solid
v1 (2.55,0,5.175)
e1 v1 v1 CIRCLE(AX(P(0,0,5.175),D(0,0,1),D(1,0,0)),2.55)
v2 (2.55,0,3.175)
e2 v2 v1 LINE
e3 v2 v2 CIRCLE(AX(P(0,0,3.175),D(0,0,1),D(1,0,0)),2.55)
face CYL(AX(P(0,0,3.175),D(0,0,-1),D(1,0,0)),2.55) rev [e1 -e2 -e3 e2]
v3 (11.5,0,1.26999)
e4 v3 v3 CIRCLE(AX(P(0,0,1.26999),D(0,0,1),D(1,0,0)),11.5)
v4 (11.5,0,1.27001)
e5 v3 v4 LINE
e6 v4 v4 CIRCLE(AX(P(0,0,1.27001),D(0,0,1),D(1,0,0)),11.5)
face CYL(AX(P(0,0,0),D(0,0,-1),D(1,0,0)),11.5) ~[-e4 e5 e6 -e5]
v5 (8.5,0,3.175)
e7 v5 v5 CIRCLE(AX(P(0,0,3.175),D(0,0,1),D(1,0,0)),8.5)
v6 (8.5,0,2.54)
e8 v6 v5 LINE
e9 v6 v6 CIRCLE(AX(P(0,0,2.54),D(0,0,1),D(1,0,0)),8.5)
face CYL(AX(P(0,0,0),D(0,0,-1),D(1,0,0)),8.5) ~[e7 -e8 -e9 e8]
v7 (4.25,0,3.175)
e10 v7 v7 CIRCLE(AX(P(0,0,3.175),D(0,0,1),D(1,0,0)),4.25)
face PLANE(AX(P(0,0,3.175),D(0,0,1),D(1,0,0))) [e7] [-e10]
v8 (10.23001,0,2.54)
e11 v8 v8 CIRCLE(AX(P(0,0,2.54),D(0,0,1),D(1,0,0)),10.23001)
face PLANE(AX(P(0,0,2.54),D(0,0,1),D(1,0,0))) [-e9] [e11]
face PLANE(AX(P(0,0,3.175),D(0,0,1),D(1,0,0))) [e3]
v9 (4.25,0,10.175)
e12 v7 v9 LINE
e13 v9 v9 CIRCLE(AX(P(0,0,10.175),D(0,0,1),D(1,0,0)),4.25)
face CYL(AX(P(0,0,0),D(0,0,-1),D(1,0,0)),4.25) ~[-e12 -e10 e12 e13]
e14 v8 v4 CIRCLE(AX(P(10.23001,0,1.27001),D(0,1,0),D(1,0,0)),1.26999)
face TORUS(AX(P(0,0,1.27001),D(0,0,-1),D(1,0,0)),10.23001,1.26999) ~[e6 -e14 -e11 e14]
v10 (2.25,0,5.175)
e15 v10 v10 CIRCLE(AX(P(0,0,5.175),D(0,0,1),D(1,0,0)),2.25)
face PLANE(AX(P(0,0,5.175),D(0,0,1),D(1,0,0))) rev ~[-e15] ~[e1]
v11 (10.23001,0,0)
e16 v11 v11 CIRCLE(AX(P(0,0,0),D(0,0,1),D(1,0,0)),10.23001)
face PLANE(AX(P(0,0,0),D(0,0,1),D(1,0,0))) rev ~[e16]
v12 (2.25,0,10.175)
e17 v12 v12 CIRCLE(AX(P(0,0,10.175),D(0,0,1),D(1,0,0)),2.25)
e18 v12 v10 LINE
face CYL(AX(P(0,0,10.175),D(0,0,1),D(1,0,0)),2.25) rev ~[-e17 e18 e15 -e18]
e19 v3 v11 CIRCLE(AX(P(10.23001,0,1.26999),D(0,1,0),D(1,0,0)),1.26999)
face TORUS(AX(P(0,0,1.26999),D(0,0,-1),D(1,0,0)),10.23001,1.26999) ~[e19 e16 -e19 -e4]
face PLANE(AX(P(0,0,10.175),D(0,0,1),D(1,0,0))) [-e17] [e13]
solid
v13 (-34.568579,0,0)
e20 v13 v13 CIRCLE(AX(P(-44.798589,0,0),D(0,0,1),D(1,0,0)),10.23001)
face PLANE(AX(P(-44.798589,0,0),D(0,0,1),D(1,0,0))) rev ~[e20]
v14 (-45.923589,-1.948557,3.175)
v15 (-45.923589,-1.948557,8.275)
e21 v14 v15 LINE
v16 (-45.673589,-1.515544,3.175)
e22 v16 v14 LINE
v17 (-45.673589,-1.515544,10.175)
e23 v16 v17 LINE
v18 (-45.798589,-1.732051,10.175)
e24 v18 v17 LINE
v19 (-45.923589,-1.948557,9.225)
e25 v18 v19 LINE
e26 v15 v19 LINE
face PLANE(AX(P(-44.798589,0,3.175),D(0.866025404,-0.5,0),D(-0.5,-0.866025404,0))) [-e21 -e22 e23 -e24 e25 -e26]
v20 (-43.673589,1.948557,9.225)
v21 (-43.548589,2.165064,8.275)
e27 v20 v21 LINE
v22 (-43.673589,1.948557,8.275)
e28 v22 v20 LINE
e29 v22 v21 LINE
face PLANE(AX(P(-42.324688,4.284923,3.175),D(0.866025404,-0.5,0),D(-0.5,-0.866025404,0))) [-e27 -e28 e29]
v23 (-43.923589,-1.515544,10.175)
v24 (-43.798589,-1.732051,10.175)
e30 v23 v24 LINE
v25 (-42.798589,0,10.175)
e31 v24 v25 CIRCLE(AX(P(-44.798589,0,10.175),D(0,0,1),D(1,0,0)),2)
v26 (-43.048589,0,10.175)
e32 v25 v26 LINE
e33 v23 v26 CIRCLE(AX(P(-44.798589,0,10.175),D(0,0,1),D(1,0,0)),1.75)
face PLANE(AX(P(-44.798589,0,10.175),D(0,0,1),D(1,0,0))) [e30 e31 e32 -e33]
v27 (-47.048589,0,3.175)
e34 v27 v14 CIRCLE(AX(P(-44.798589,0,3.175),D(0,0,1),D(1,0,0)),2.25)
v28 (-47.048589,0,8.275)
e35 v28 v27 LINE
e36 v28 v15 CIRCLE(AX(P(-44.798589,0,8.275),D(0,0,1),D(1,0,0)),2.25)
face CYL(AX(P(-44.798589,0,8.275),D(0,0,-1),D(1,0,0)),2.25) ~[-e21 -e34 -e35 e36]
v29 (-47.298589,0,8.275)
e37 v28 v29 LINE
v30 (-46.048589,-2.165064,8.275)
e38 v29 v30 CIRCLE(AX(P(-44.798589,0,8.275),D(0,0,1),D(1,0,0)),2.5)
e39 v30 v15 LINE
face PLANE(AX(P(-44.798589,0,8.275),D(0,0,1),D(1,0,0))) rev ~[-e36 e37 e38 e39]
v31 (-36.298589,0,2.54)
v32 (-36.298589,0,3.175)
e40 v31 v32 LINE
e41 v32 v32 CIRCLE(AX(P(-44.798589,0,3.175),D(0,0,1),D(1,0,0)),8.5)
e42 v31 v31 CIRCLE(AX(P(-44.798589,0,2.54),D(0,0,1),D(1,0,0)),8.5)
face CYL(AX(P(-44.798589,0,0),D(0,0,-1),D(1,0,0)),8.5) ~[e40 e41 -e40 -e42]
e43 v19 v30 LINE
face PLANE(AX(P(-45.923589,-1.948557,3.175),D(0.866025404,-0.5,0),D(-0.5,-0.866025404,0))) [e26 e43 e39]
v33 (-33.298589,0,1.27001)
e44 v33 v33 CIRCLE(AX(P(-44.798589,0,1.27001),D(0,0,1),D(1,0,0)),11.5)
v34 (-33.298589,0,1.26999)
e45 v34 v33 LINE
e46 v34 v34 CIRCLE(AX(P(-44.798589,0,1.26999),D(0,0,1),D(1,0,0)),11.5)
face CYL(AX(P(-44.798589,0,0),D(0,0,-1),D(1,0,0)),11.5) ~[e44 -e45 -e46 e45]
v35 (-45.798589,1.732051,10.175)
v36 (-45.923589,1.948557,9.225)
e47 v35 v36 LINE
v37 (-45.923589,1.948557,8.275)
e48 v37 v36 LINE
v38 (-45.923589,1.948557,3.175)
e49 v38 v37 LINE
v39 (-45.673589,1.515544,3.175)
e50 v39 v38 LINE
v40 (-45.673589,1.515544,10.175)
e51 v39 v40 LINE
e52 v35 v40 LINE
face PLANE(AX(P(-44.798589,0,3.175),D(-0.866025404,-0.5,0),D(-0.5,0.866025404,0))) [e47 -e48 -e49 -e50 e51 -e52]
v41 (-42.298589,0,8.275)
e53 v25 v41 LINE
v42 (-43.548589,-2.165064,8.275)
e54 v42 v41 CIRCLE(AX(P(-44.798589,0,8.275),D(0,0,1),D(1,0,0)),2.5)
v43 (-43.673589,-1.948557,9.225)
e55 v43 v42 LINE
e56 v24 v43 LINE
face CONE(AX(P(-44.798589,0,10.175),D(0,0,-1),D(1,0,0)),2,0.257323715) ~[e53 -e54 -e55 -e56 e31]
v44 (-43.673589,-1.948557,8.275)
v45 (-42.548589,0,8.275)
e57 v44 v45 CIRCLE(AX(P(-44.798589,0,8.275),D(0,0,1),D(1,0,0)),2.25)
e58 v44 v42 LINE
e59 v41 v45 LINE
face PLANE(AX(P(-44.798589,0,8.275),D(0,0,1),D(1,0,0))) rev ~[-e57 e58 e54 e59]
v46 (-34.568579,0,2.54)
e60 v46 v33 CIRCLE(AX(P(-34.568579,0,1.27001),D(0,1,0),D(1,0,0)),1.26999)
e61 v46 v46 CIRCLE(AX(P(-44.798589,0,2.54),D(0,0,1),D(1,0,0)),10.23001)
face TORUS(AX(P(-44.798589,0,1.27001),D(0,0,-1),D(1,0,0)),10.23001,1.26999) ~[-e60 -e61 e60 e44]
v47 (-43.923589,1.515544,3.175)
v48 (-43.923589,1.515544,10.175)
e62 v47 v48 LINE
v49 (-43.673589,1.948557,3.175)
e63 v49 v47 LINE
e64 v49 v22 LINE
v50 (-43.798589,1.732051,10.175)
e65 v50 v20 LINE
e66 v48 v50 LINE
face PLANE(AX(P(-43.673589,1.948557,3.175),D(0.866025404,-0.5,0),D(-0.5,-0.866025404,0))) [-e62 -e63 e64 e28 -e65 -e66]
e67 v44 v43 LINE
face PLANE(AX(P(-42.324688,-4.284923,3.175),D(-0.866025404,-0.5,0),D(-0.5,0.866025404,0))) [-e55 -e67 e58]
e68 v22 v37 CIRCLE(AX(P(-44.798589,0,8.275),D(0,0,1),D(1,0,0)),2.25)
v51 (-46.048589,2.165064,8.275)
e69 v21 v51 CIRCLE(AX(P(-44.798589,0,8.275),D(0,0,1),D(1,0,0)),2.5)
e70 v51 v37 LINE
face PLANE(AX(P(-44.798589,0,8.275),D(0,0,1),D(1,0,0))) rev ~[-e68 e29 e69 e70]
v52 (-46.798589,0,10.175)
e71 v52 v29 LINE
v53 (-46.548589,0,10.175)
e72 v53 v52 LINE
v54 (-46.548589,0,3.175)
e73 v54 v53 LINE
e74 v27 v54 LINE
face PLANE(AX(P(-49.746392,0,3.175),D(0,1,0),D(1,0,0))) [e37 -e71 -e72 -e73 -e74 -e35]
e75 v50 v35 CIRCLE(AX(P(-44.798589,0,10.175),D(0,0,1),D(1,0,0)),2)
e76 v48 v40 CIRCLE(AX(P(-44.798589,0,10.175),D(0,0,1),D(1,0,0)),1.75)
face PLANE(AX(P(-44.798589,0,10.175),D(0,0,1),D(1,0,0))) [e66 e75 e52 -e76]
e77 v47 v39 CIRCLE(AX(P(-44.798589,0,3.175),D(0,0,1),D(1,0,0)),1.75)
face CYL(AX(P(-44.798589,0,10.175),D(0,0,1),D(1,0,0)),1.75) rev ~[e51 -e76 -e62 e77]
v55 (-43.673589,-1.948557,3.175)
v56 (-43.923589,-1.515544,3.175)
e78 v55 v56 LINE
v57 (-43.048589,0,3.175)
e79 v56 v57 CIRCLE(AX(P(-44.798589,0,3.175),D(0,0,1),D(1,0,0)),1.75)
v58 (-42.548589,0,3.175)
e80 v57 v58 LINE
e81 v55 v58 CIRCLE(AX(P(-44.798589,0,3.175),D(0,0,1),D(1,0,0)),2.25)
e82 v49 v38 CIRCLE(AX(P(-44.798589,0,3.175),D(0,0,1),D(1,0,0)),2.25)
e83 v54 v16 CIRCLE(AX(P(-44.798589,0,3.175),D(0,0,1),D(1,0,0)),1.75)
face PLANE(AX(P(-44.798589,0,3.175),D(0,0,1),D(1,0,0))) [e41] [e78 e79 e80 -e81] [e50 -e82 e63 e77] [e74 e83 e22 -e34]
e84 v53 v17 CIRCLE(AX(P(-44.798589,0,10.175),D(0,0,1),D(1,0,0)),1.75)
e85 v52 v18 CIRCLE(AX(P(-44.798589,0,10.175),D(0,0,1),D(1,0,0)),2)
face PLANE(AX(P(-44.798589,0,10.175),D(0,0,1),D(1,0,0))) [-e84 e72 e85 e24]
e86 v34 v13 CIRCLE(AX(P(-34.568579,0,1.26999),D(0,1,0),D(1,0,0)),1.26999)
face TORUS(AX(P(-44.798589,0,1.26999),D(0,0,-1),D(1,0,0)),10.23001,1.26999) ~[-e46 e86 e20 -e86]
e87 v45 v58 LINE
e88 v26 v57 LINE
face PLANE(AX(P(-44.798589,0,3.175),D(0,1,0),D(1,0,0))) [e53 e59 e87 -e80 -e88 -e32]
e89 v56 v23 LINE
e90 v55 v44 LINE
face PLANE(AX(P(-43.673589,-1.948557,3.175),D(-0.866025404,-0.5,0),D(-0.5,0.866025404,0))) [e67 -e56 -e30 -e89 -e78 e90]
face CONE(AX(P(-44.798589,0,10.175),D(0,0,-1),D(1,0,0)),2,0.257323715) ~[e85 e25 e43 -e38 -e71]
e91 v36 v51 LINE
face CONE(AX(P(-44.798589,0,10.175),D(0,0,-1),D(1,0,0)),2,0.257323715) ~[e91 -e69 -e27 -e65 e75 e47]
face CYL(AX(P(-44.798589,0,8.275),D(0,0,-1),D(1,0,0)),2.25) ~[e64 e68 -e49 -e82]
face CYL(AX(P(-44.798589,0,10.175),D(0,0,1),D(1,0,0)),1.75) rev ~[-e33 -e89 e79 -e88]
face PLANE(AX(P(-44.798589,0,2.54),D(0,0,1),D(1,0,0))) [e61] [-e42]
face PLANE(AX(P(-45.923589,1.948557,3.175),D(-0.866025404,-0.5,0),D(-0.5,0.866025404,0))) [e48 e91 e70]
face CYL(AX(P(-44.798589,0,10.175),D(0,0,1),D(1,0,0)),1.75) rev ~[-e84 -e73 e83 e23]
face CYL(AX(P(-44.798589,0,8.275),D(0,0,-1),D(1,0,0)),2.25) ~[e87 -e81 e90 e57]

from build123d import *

# Parameters (mm, degrees)
F0_R      = 11.5
F0_R_2    = 8.5
F1_DEPTH  = 2.54
F0_R_3    = 4.25
F2_DEPTH  = 3.175
F3_DEPTH  = 10.175
F4_R      = 1.26999
F5_R      = 11.5
F5_R_2    = 8.5
F6_DEPTH  = 2.54
F5_R_3    = 2.5
F7_DEPTH  = 3.175
F8_DEPTH  = 10.175
F9_R      = 2.25
F10_DEPTH = 7
F11_R     = 1.26999
F12_R     = 2.55
F13_DEPTH = 2
F16_R     = 1.75
F17_DEPTH = 7
F19_DEPTH = 25.4


# Not quite as in the source:
# - a fillet or chamfer is up to 0.001 mm smaller than in the source, because OpenCascade refuses the exact size


with BuildPart() as f1:
    # F0 (on Top) → F1 (new body)
    with BuildSketch(Plane.XY):
        Circle(F0_R)
        Circle(F0_R_2, mode=Mode.SUBTRACT)
    extrude(amount=F1_DEPTH)

    # F0 (on Top) → F2 (join)
    with BuildSketch(Plane.XY):
        Circle(F0_R_2)
        Circle(F0_R_3, mode=Mode.SUBTRACT)
    extrude(amount=F2_DEPTH)

    # F0 (on Top) → F3 (join)
    with BuildSketch(Plane.XY):
        Circle(F0_R_3)
    extrude(amount=F3_DEPTH)

    # F4 (radius 1.27 in the source; OpenCascade refuses exactly that, so slightly less here)
    f4_edges = [f1.edges().sort_by_distance(p)[0] for p in [
        (-11.5, 0, 2.54),
        (-11.5, 0, 0),
    ]]
    fillet(f4_edges, radius=F4_R)

    # F9 (on face) → F10 (cut)
    with BuildSketch(Plane.XY.offset(10.175)):
        Circle(F9_R)
    extrude(amount=-F10_DEPTH, mode=Mode.SUBTRACT)

    # F12 (on face) → F13 (cut)
    with BuildSketch(Plane.XY.offset(3.175)):
        Circle(F12_R)
    extrude(amount=F13_DEPTH, mode=Mode.SUBTRACT)


with BuildPart() as f6:
    # F5 (on Top) → F6 (new body)
    with BuildSketch(Plane.XY):
        with Locations((-44.7985892718, 0)):
            Circle(F5_R)
        with Locations((-44.7985892718, 0)):
            Circle(F5_R_2, mode=Mode.SUBTRACT)
    extrude(amount=F6_DEPTH)

    # F5 (on Top) → F7 (join)
    with BuildSketch(Plane.XY):
        with Locations((-44.7985892718, 0)):
            Circle(F5_R_2)
        with Locations((-44.7985892718, 0)):
            Circle(F5_R_3, mode=Mode.SUBTRACT)
    extrude(amount=F7_DEPTH)

    # F5 (on Top) → F8 (join)
    with BuildSketch(Plane.XY):
        with Locations((-44.7985892718, 0)):
            Circle(F5_R_3)
    extrude(amount=F8_DEPTH)

    # F11 (radius 1.27 in the source; OpenCascade refuses exactly that, so slightly less here)
    f11_edges = [f6.edges().sort_by_distance(p)[0] for p in [
        (-56.298589, 0, 2.54),
        (-56.298589, 0, 0),
    ]]
    fillet(f11_edges, radius=F11_R)

    # F14 (on Front) → F15 (revolve, cut)
    with BuildSketch(Plane.XZ):
        Polygon((-42.5485892718, 8.275), (-42.5485892718, 3.175), (-41.8997183442, 3.175), (-41.6368916631, 8.275), (-42.2985892718, 8.275), align=None)
        Polygon((-42.5485892718, 10.175), (-42.7985892718, 10.175), (-42.2985892718, 8.275), (-41.6368916631, 8.275), (-41.8774240868, 10.2633112086), align=None)
    revolve(axis=Axis((-44.7985892718, 0, 5.0875), (0, 0, 1)), mode=Mode.SUBTRACT)

    # F16 (on face) → F17 (cut)
    with BuildSketch(Plane.XY.offset(10.175)):
        with Locations((-44.7985892718, 0)):
            Circle(F16_R)
    extrude(amount=-F17_DEPTH, mode=Mode.SUBTRACT)

    # F18 (on face) → F19 (cut)
    with BuildSketch(Plane.XY.offset(3.175)):
        with BuildLine():
            Line((-45.9235892718, 1.9485571585), (-47.2724906726, 4.2849229191))
            ThreePointArc((-47.2724906726, 4.2849229191), (-49.0835121909, 2.4739014008), (-49.7463920734, 0))
            Line((-49.7463920734, 0), (-47.0485892718, 0))
            ThreePointArc((-47.0485892718, 0), (-46.7471464303, 1.125), (-45.9235892718, 1.9485571585))
        make_face()
        with BuildLine():
            Line((-47.0485892718, 0), (-44.7985892718, 0))
            Line((-44.7985892718, 0), (-45.9235892718, 1.9485571585))
            ThreePointArc((-45.9235892718, 1.9485571585), (-46.7471464303, 1.125), (-47.0485892718, 0))
        make_face()
        with BuildLine():
            Line((-42.5485892718, 0), (-39.8507864702, 0))
            ThreePointArc((-39.8507864702, 0), (-40.5136663527, 2.4739014008), (-42.324687871, 4.2849229191))
            Line((-42.324687871, 4.2849229191), (-43.6735892718, 1.9485571585))
            ThreePointArc((-43.6735892718, 1.9485571585), (-42.8500321132, 1.125), (-42.5485892718, 0))
        make_face()
        with BuildLine():
            Line((-44.7985892718, 0), (-42.5485892718, 0))
            ThreePointArc((-42.5485892718, 0), (-42.8500321132, 1.125), (-43.6735892718, 1.9485571585))
            Line((-43.6735892718, 1.9485571585), (-44.7985892718, 0))
        make_face()
        with BuildLine():
            ThreePointArc((-47.2724906726, -4.2849229191), (-44.7985892718, -4.9478028016), (-42.324687871, -4.2849229191))
            Line((-42.324687871, -4.2849229191), (-43.6735892718, -1.9485571585))
            ThreePointArc((-43.6735892718, -1.9485571585), (-44.7985892718, -2.25), (-45.9235892718, -1.9485571585))
            Line((-45.9235892718, -1.9485571585), (-47.2724906726, -4.2849229191))
        make_face()
        with BuildLine():
            Line((-43.6735892718, -1.9485571585), (-44.7985892718, 0))
            Line((-44.7985892718, 0), (-45.9235892718, -1.9485571585))
            ThreePointArc((-45.9235892718, -1.9485571585), (-44.7985892718, -2.25), (-43.6735892718, -1.9485571585))
        make_face()
    extrude(amount=F19_DEPTH, mode=Mode.SUBTRACT)


solid = Compound([f1.part, f6.part])
